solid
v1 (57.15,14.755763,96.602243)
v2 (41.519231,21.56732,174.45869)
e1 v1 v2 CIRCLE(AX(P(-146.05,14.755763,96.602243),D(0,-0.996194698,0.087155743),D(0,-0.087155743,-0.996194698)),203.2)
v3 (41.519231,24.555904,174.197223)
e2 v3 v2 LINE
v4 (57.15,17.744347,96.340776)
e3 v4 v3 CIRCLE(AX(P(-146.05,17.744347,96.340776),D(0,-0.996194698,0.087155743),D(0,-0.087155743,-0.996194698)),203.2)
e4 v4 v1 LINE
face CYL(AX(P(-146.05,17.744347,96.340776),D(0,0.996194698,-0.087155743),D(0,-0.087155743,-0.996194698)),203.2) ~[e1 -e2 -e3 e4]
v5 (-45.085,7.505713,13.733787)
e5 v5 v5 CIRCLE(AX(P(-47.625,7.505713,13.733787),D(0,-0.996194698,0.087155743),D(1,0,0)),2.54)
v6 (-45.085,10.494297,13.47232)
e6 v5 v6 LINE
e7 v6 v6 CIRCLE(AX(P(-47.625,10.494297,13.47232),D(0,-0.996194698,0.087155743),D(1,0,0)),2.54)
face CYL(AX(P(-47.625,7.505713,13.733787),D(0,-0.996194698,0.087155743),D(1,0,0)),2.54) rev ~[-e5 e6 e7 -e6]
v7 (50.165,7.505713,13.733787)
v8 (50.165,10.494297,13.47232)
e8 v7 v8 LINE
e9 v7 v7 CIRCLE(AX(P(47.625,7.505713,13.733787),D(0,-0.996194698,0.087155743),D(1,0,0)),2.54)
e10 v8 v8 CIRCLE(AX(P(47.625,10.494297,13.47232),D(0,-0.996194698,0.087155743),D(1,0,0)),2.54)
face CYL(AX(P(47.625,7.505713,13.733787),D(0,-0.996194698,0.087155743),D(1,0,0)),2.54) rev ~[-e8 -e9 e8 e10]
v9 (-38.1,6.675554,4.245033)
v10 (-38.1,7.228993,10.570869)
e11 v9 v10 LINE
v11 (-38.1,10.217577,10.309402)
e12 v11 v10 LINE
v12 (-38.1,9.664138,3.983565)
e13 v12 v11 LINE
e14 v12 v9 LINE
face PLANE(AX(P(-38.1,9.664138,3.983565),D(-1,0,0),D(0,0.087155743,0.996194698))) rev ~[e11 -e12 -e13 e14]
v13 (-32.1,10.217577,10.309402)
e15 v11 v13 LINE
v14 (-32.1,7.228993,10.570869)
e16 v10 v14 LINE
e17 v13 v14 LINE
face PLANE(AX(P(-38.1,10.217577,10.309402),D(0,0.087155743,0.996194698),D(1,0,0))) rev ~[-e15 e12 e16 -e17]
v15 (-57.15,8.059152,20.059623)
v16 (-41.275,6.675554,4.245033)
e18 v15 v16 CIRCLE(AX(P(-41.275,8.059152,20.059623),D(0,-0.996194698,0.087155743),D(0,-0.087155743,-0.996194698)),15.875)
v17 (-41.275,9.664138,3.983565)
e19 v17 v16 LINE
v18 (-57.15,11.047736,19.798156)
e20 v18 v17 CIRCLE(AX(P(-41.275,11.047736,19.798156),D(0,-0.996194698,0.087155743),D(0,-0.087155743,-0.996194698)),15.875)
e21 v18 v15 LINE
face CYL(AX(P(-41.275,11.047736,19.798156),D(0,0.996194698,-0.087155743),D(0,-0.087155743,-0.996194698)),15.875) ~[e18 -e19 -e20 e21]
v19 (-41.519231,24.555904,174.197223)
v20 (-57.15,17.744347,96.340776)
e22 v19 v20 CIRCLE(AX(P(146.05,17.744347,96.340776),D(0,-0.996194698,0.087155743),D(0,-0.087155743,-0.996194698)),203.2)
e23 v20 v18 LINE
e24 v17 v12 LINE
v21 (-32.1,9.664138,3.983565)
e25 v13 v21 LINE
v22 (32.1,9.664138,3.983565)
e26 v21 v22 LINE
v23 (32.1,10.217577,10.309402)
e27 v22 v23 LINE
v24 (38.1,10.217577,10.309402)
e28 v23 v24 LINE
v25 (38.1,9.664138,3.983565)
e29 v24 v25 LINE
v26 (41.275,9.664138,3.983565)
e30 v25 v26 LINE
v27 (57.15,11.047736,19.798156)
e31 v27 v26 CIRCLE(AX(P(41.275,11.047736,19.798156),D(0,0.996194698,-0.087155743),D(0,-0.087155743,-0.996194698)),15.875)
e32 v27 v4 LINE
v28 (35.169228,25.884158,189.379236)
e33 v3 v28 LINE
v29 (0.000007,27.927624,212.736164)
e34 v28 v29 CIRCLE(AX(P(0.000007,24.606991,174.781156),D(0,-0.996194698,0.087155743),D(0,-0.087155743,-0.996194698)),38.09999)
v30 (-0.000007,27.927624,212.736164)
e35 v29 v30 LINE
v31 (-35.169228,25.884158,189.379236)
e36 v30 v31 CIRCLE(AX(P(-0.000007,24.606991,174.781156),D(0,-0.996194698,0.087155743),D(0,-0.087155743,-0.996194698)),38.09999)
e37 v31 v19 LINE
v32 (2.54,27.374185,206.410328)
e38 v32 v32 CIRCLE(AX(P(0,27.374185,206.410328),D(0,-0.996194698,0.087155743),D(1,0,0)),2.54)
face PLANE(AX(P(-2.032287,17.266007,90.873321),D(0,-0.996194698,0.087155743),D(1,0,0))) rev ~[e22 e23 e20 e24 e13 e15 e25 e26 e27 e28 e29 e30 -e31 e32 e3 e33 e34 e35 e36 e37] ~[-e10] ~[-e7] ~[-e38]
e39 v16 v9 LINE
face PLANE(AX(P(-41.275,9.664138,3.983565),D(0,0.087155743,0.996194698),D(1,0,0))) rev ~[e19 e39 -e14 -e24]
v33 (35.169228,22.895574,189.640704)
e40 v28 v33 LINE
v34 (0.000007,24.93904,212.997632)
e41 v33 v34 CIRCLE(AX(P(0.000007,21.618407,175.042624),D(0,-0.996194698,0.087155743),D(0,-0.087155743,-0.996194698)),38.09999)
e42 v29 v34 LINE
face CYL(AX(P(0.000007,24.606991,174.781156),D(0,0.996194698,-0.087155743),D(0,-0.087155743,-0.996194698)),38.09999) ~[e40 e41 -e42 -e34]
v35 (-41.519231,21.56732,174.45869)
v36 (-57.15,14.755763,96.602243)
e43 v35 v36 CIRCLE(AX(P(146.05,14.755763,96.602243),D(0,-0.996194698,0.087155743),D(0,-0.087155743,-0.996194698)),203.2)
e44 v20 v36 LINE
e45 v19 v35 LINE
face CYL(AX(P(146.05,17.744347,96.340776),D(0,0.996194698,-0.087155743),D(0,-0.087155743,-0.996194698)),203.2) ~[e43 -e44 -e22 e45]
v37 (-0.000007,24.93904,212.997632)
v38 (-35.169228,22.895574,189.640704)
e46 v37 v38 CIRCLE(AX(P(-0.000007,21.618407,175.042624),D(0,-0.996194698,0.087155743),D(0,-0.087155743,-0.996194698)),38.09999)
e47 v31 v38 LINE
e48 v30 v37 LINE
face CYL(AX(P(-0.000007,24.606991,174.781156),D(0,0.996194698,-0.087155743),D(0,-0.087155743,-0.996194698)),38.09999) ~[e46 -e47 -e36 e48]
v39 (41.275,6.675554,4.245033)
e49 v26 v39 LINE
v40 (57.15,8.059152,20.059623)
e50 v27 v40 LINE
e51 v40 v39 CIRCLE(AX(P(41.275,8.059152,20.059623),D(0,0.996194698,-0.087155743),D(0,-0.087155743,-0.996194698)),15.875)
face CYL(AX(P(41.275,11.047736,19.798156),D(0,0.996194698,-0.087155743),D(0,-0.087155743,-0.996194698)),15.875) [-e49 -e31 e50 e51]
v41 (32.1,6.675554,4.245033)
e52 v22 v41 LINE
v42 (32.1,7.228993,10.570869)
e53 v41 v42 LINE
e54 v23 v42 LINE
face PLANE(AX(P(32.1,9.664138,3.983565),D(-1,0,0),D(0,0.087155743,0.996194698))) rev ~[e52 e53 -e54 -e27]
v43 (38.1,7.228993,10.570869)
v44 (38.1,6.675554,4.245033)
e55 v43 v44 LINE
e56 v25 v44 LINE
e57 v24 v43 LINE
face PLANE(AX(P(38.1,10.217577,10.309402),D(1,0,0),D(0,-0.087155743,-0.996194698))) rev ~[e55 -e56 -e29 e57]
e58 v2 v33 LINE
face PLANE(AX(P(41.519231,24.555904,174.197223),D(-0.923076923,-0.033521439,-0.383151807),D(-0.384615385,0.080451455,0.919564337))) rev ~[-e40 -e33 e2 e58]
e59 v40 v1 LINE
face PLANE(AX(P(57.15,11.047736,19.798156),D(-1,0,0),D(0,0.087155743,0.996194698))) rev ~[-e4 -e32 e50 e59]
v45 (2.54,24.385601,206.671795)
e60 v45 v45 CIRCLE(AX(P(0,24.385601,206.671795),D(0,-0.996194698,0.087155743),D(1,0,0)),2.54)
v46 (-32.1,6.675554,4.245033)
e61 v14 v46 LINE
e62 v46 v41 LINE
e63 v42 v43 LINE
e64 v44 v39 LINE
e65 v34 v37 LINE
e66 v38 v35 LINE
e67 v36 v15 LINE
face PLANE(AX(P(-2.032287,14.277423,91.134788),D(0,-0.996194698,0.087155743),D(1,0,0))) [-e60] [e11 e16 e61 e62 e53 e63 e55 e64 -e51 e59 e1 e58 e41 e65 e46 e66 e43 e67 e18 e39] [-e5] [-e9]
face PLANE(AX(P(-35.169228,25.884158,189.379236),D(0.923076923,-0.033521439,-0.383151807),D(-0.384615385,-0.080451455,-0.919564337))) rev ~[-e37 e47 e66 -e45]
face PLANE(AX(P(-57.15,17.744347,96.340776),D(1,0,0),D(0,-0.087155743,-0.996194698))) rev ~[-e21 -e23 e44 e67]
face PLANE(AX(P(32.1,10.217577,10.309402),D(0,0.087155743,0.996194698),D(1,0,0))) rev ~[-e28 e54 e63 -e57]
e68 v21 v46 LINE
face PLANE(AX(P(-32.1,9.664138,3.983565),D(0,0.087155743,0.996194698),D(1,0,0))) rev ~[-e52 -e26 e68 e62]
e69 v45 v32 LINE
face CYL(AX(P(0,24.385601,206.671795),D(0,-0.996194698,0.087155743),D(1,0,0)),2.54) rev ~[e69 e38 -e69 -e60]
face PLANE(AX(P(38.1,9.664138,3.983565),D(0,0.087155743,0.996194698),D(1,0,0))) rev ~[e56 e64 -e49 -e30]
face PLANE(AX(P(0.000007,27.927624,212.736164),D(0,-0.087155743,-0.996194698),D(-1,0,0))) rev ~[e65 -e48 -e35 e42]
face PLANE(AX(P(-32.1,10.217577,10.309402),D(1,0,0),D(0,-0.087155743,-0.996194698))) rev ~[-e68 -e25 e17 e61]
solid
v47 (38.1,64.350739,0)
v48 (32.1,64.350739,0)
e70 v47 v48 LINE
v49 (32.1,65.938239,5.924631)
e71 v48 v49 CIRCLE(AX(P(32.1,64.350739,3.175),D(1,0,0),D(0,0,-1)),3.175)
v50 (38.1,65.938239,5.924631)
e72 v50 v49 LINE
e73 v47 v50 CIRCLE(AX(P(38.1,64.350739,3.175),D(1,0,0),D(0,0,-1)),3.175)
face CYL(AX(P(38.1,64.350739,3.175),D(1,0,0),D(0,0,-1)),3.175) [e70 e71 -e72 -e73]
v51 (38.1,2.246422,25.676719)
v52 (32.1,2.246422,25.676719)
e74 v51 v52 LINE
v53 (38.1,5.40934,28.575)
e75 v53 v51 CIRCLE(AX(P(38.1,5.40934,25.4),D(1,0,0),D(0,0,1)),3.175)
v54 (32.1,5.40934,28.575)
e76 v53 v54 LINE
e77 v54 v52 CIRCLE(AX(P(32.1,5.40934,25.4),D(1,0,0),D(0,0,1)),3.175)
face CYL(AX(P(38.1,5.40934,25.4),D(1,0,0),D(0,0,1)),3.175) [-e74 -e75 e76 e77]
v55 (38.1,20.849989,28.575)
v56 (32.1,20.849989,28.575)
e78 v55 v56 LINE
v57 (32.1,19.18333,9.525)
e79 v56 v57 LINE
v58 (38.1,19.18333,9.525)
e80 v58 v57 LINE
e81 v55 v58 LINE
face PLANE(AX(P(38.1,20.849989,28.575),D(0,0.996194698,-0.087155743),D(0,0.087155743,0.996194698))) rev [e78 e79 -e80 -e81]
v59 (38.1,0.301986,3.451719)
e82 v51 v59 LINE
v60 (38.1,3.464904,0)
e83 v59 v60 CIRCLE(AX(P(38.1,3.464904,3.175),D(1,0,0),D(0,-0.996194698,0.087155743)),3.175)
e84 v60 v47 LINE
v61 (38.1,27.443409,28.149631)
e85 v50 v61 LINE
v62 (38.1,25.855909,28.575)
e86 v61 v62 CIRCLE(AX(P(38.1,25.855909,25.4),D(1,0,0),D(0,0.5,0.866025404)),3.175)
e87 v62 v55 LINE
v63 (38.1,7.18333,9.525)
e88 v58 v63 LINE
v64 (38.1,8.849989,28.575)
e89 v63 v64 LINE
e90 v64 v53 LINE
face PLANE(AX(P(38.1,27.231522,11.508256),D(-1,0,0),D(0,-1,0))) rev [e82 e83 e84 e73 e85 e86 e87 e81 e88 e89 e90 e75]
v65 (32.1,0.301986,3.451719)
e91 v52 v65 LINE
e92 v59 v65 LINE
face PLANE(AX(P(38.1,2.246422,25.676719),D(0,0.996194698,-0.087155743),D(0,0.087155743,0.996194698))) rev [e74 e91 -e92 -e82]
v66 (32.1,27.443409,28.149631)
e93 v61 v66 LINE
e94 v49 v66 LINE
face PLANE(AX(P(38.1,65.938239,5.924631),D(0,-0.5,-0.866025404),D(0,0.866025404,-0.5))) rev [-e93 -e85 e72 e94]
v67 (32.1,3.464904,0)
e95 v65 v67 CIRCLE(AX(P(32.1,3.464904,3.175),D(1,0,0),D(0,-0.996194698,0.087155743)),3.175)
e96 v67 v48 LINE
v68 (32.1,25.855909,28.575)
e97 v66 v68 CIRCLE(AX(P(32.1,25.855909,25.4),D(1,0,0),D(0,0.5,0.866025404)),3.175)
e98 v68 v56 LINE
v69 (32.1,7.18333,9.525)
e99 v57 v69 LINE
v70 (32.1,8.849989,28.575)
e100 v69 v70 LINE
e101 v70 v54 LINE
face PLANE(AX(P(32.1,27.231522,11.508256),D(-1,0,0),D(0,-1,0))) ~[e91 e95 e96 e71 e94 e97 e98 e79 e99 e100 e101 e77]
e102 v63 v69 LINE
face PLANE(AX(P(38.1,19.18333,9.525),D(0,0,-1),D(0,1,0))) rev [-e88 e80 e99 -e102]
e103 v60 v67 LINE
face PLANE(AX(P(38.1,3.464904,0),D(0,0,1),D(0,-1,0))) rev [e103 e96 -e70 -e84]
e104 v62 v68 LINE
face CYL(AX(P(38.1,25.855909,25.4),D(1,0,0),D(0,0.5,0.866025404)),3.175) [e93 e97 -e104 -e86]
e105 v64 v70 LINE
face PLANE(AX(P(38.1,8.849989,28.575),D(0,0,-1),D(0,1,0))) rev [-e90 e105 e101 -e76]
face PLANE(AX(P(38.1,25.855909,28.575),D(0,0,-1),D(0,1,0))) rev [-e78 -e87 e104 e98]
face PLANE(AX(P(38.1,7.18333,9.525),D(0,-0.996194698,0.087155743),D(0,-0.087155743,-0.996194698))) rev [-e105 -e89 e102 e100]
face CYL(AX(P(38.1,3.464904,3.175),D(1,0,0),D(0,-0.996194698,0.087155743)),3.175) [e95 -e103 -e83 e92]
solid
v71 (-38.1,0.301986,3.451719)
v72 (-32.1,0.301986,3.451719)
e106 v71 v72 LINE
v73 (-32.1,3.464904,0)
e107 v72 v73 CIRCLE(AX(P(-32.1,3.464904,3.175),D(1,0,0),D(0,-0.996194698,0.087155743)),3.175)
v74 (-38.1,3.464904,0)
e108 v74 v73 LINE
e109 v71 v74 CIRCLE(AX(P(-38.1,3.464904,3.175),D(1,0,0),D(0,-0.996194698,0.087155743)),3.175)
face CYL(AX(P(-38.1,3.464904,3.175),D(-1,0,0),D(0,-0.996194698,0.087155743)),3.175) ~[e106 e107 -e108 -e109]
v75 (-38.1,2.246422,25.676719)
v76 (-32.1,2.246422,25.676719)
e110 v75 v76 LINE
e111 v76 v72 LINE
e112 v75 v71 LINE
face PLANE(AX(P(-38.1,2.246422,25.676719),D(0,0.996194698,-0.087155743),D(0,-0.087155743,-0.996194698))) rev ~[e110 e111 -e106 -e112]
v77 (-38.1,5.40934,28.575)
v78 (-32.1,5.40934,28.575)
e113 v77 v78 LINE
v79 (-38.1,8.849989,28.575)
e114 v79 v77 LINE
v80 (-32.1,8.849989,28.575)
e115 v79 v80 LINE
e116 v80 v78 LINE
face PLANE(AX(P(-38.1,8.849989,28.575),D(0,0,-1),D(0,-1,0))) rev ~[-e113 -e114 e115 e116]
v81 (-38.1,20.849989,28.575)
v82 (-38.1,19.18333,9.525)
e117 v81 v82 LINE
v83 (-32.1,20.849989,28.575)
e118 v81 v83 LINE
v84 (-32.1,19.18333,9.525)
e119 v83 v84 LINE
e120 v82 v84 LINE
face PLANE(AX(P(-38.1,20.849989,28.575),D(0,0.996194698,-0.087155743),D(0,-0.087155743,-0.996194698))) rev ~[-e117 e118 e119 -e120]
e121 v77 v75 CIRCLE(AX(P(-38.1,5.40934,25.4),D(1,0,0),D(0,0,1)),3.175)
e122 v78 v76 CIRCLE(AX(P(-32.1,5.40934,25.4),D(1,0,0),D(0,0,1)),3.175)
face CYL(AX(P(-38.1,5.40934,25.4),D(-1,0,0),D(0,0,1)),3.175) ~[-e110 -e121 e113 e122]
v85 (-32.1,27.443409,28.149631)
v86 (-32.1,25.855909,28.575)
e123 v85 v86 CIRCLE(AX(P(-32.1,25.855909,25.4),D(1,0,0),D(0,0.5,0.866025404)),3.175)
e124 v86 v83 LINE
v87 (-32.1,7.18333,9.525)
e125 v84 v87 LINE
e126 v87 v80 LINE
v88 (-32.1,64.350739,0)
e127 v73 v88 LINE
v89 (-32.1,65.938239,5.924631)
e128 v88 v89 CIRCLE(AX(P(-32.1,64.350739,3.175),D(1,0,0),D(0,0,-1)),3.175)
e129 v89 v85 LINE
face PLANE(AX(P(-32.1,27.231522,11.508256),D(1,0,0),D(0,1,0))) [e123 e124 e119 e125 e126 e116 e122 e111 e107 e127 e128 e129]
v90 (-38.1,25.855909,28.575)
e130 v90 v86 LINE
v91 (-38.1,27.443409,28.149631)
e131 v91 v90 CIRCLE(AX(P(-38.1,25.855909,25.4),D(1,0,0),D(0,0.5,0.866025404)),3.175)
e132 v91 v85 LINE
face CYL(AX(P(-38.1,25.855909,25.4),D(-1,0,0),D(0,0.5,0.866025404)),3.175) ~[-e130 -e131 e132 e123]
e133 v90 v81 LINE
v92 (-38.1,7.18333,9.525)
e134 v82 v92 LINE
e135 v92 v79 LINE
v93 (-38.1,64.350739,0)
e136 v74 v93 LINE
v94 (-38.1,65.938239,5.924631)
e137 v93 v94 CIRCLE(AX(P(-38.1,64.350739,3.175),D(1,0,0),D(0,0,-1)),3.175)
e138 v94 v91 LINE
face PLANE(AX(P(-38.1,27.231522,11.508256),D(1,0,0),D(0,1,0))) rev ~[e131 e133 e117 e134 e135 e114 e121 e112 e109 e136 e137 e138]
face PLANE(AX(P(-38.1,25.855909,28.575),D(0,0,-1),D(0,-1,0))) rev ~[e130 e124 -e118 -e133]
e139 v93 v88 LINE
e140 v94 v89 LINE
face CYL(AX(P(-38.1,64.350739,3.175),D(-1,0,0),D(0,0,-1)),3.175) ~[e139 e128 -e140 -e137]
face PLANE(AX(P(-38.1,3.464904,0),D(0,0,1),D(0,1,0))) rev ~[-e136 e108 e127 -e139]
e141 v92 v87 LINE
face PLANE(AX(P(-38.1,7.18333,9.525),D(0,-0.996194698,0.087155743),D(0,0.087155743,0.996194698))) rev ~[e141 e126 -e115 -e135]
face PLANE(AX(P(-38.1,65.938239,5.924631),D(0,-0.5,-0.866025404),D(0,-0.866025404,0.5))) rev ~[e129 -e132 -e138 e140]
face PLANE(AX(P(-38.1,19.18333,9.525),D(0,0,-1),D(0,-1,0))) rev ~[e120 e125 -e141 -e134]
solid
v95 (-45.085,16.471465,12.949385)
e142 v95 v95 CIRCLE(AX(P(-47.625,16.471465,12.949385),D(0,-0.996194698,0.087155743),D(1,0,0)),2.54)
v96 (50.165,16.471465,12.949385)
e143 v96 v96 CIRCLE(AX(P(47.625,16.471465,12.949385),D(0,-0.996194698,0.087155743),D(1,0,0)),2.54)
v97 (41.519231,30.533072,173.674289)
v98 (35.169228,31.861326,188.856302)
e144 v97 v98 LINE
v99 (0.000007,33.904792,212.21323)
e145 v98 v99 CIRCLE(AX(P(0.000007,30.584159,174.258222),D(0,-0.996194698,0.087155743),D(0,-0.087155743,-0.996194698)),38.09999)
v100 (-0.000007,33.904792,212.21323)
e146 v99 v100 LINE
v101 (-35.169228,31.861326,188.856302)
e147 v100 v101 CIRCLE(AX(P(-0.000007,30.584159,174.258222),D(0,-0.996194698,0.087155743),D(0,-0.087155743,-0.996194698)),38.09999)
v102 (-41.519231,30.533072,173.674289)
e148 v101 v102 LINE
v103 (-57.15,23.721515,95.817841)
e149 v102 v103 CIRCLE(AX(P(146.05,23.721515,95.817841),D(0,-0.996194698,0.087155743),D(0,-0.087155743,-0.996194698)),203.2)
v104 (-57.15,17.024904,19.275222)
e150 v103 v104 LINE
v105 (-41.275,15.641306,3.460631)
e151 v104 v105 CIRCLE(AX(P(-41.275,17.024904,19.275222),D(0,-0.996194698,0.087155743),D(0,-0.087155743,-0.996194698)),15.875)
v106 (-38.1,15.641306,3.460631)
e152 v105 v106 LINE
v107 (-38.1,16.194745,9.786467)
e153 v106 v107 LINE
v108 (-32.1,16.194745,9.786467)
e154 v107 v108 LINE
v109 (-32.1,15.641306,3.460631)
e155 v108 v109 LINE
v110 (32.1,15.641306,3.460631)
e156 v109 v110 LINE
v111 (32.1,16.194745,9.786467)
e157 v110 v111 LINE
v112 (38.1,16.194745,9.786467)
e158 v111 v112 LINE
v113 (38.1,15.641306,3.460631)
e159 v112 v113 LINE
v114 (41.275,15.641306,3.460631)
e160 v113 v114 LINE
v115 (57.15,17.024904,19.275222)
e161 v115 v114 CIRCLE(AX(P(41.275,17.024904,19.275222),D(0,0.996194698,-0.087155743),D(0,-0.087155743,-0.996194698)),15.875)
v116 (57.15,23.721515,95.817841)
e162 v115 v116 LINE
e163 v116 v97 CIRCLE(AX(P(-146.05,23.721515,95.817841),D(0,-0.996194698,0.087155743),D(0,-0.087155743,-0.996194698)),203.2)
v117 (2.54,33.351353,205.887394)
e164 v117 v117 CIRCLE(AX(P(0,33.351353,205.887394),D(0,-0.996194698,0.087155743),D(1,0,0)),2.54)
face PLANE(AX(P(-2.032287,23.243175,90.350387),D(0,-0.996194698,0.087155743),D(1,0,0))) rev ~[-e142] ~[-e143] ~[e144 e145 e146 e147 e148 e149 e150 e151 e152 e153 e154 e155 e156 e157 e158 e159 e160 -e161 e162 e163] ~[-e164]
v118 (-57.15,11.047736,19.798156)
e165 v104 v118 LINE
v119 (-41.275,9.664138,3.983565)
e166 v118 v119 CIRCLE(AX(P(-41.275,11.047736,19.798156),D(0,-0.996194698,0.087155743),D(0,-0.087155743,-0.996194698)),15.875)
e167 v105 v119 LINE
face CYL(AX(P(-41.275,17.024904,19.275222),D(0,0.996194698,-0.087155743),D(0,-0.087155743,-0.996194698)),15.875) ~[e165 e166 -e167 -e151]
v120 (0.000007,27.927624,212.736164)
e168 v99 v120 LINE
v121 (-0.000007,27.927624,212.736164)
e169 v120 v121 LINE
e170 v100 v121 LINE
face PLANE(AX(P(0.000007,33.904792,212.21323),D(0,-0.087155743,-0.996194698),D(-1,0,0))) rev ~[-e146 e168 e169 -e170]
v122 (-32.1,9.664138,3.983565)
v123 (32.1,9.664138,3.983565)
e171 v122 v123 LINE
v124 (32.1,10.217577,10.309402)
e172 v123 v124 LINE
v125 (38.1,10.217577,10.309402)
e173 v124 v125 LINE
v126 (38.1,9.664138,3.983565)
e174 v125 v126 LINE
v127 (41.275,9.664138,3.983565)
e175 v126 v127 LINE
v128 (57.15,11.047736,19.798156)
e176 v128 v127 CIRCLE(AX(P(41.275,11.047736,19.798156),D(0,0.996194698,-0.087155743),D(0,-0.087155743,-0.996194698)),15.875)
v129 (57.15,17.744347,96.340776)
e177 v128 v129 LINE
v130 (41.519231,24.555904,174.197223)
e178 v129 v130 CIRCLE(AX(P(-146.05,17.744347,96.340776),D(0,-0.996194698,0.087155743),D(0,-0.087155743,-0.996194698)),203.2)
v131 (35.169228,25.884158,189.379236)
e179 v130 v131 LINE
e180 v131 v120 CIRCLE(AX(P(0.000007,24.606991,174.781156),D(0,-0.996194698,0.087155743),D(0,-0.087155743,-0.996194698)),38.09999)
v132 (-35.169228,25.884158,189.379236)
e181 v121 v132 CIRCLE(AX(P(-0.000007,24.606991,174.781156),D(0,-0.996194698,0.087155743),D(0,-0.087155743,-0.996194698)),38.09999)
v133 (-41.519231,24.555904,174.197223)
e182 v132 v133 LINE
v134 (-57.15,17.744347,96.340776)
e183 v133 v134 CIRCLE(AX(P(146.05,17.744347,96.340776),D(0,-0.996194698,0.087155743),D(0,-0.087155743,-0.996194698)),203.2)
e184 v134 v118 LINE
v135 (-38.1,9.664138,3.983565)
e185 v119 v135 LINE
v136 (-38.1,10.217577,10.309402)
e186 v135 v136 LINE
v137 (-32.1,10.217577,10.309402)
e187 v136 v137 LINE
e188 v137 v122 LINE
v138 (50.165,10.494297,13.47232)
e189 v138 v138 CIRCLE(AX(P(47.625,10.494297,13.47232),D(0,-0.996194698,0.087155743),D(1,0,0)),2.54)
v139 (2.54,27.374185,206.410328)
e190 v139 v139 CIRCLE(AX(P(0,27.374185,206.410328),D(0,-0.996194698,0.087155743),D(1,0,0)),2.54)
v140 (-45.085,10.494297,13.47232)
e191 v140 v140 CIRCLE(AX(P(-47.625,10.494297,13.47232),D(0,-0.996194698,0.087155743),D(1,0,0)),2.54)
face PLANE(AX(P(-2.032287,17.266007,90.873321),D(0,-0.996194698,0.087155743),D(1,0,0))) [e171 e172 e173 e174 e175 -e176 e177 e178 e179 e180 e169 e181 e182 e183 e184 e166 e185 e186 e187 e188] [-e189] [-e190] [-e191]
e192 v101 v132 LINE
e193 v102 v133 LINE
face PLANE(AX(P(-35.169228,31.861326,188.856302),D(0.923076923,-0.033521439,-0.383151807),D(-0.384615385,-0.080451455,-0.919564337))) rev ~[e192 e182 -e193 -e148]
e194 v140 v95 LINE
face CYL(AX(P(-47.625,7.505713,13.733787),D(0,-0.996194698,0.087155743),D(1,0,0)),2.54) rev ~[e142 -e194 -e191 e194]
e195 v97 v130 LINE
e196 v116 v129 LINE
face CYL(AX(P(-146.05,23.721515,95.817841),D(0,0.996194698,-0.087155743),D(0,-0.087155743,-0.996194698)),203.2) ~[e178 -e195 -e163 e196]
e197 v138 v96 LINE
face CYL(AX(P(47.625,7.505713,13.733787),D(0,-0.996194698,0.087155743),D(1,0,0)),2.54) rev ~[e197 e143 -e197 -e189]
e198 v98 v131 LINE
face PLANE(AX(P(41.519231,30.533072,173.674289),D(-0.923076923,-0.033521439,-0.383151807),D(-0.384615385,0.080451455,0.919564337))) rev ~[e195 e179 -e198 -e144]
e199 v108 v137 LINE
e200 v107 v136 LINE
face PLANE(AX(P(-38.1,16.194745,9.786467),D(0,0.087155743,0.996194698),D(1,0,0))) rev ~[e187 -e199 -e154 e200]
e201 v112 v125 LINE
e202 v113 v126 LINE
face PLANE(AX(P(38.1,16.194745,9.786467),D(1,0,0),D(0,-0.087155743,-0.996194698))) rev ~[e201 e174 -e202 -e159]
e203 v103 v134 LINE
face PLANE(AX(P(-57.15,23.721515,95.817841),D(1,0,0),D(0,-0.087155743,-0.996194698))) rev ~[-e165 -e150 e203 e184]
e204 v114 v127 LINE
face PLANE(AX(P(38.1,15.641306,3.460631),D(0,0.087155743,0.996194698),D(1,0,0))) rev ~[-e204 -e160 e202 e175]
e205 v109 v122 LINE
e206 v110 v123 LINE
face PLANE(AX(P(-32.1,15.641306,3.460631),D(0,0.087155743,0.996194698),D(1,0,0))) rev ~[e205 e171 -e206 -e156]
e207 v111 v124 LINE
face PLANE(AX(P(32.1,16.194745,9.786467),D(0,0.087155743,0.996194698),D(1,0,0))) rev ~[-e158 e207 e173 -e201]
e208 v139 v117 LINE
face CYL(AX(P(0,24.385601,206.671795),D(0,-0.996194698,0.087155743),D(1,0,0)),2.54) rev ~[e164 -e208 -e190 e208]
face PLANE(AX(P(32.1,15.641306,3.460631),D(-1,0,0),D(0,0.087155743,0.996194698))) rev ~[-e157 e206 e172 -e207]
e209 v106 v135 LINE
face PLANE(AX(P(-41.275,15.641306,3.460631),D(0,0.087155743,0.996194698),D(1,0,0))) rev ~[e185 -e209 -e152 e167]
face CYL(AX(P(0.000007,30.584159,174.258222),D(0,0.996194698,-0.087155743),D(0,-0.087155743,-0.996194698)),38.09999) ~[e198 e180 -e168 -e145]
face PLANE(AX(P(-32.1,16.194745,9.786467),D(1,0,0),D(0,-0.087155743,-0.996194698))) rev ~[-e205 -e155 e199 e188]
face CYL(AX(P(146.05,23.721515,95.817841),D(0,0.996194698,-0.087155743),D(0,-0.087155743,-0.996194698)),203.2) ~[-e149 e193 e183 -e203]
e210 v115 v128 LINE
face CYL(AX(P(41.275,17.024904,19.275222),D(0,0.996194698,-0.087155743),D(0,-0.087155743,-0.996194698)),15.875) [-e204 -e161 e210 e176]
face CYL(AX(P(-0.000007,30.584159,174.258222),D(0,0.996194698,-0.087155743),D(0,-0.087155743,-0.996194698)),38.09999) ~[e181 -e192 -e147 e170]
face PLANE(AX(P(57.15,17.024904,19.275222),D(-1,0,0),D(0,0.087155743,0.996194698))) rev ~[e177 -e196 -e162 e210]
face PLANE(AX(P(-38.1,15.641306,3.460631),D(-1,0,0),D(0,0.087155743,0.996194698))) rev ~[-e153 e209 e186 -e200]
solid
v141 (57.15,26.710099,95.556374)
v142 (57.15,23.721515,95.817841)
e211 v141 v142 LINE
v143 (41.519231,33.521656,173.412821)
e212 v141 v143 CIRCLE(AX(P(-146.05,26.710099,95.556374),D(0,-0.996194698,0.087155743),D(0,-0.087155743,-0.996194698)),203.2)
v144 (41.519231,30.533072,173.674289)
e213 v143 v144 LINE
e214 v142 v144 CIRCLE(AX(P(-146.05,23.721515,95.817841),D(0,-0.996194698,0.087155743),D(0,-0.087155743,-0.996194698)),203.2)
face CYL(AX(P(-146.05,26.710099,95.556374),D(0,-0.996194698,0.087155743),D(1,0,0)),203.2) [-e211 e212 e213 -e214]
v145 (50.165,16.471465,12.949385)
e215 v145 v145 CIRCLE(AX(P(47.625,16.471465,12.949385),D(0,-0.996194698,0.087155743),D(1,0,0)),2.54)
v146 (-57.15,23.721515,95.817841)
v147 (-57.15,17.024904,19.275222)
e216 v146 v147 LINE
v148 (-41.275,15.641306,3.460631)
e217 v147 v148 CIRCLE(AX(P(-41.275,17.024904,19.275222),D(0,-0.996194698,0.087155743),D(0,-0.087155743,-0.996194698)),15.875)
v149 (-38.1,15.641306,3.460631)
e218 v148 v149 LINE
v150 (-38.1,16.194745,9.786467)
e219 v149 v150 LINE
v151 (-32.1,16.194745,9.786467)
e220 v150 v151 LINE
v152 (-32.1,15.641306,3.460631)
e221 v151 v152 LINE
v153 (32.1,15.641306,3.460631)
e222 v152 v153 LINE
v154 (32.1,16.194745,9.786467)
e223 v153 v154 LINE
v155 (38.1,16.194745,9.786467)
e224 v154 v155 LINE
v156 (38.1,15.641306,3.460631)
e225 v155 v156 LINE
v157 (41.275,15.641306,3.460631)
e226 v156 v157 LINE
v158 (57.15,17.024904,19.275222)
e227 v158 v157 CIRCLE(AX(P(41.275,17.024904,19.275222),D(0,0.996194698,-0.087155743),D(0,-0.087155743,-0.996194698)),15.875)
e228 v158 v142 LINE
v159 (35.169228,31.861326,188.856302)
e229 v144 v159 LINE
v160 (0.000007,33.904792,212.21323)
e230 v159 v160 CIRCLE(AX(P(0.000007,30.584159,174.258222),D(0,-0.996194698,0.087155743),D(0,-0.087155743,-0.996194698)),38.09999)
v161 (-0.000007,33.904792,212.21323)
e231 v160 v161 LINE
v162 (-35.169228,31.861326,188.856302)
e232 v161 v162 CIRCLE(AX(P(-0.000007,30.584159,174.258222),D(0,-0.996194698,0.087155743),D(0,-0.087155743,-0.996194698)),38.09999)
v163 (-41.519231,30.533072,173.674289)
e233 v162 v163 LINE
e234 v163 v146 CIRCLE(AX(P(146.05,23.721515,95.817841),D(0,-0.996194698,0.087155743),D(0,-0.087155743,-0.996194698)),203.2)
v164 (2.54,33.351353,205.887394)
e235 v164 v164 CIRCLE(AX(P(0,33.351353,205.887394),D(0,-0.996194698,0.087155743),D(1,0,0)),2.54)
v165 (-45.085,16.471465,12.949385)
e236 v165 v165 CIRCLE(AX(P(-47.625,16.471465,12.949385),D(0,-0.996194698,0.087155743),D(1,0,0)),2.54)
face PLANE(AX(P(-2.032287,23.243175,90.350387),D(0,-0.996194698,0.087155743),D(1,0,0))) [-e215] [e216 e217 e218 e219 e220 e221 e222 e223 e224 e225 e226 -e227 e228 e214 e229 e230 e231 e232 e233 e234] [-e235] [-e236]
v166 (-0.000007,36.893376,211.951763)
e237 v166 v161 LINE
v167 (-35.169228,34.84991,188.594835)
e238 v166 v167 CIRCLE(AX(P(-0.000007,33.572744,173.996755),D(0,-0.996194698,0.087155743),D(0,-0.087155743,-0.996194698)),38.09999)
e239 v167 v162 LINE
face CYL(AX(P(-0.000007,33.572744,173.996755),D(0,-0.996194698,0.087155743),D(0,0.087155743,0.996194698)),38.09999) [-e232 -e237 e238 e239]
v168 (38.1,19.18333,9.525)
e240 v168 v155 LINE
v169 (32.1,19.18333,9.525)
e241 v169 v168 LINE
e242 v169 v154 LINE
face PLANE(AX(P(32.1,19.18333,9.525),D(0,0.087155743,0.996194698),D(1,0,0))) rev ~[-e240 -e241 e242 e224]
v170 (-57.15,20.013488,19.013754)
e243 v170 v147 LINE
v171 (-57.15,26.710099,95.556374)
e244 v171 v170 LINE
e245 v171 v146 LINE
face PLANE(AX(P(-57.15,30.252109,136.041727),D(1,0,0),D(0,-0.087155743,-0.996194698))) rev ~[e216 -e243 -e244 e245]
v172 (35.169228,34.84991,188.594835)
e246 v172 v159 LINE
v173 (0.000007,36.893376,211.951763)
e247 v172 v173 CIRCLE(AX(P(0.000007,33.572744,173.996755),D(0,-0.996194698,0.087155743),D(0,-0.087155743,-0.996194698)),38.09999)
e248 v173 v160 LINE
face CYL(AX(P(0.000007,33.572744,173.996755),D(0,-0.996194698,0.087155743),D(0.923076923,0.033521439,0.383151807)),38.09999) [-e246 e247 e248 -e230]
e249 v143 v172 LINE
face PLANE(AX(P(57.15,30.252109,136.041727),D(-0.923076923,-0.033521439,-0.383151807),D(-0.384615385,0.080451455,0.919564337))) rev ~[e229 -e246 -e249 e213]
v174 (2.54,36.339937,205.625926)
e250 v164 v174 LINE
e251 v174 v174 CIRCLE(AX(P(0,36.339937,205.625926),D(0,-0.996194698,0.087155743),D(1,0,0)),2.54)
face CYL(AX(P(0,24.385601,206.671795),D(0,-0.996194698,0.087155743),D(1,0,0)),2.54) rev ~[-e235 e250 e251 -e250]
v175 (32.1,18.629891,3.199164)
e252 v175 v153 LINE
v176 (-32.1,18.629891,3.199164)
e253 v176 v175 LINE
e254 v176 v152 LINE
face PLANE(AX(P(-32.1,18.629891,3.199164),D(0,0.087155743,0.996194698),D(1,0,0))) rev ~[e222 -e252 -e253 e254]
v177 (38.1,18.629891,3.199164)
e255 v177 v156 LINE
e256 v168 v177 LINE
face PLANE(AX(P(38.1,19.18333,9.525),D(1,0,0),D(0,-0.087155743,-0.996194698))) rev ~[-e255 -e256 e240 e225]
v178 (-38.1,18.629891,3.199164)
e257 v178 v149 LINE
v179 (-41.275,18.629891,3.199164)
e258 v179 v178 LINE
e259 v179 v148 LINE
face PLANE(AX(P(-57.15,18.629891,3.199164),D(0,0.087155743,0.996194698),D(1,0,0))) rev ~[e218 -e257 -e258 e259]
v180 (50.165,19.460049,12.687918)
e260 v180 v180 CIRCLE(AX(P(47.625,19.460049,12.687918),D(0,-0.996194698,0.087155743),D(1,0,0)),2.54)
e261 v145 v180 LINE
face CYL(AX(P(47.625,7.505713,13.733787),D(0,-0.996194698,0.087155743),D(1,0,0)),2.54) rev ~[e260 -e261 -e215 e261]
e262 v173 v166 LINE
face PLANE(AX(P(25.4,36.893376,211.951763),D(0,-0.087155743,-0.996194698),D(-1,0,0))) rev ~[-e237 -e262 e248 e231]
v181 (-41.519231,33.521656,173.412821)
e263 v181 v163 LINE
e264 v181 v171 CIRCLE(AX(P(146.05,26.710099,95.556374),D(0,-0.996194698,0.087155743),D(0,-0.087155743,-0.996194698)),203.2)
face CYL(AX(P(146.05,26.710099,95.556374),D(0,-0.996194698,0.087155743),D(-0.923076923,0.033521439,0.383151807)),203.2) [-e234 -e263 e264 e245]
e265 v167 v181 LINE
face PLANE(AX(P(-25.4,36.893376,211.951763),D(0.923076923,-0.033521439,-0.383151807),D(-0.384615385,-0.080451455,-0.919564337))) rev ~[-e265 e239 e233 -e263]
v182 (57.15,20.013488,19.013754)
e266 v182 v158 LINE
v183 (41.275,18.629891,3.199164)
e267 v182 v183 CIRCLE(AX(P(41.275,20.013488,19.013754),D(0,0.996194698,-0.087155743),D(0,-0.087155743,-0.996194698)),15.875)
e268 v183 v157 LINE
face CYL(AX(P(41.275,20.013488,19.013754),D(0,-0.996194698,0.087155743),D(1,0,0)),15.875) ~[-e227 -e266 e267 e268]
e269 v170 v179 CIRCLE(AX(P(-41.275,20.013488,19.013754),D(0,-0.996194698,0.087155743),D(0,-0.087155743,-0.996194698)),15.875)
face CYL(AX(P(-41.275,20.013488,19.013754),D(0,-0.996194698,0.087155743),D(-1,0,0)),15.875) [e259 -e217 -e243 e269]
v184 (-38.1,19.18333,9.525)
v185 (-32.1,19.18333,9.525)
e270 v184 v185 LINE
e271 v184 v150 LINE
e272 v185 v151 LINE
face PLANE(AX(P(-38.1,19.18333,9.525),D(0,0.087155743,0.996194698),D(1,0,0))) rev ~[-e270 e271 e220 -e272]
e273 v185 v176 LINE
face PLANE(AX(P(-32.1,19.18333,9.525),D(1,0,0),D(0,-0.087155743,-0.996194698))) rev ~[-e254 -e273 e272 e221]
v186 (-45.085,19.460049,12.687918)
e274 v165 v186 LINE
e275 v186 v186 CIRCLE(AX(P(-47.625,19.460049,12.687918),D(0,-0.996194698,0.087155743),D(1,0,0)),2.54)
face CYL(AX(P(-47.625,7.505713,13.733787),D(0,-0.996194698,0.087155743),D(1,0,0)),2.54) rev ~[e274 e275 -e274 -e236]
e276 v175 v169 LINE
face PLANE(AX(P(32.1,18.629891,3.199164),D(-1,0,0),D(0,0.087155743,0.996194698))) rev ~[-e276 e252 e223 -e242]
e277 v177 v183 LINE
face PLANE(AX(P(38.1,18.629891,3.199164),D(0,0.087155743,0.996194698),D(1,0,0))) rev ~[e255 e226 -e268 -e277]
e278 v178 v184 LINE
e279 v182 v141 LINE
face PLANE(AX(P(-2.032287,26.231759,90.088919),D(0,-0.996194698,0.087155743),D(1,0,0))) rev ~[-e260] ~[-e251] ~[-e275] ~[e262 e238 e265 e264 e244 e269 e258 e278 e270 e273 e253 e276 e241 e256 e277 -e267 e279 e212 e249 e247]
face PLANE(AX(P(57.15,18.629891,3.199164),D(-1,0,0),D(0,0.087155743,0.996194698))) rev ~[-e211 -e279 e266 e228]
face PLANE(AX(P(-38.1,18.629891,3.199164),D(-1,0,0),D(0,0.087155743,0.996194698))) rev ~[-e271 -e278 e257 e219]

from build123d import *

# Parameters (mm, degrees)
F2_DEPTH  = 6
F4_W      = 6
F4_H      = 19.1227679052
F5_DEPTH  = 3
F6_R      = 203.2
F7_R      = 38.09999
F8_R      = 15.875
F9_DEPTH  = 6
F10_DEPTH = 3
F11_R     = 2.54
F12_DEPTH = 25.4


# Not quite as in the source:
# - a fillet or chamfer is up to 0.001 mm smaller than in the source, because OpenCascade refuses the exact size


with BuildPart() as f2:
    # F1 (on offset) → F2 (new body)
    with BuildSketch(Plane.YZ.offset(-38.1)):
        with BuildLine():
            ThreePointArc((0.3019863245, 3.4517194832), (1.1240489465, 1.0300010908), (3.4649044909, 0))
            Line((3.4649044909, 0), (64.350738686, 0))
            ThreePointArc((64.350738686, 0), (67.4175531844, 2.3532495318), (65.938238686, 5.924630657))
            Line((65.938238686, 5.924630657), (27.4434094878, 28.149630657))
            ThreePointArc((27.4434094878, 28.149630657), (26.677659956, 28.4668144985), (25.8559094878, 28.575))
            Line((25.8559094878, 28.575), (20.8499885603, 28.575))
            Line((20.8499885603, 28.575), (19.1833295201, 9.525))
            Line((19.1833295201, 9.525), (7.1833295201, 9.525))
            Line((7.1833295201, 9.525), (8.8499885603, 28.575))
            Line((8.8499885603, 28.575), (5.4093400378, 28.575))
            ThreePointArc((5.4093400378, 28.575), (3.2643411286, 27.7408555444), (2.2464218713, 25.6767194832))
            Line((2.2464218713, 25.6767194832), (0.3019863245, 3.4517194832))
        make_face()
    extrude(amount=F2_DEPTH)


with BuildPart() as f3_1:
    # F3: instance of F2
    add(f2.part.mirror(Plane.YZ))


with BuildPart() as f5:
    # F4 (on face) → F5 (new body)
    with BuildSketch(Plane(origin=(0, 18.2106111339, -1.5932220301), x_dir=(1, 0, 0), z_dir=(0, -0.9961946981, 0.0871557427))):
        Polygon((32.1, 11.160691832), (38.1, 11.160691832), (38.1, 4.810691832), (57.15, 4.810691832), (57.15, 11.160691832), (57.15, 138.160691832), (25.4, 214.360691832), (-25.4, 214.360691832), (-57.15, 138.160691832), (-57.15, 11.160691832), (-57.15, 4.810691832), (-38.1, 4.810691832), (-38.1, 11.160691832), (-38.1, 30.2834597372), (-32.1, 30.2834597372), (-32.1, 11.160691832), (-32.1, 4.810691832), (32.1, 4.810691832), align=None)
        with Locations((-35.1, 20.7220757846)):
            Rectangle(F4_W, F4_H)
    extrude(amount=F5_DEPTH)

    # F6
    f6_edges = [f5.edges().sort_by_distance(p)[0] for p in [
        (-57.15, 28.757817, 136.17246),
        (57.15, 28.757817, 136.17246),
    ]]
    fillet(f6_edges, radius=F6_R)

    # F7 (radius 38.1 in the source; OpenCascade refuses exactly that, so slightly less here)
    f7_edges = [f5.edges().sort_by_distance(p)[0] for p in [
        (-25.4, 35.399084, 212.082496),
        (25.4, 35.399084, 212.082496),
    ]]
    fillet(f7_edges, radius=F7_R)

    # F8
    f8_edges = [f5.edges().sort_by_distance(p)[0] for p in [
        (-57.15, 17.135599, 3.329897),
        (57.15, 17.135599, 3.329897),
    ]]
    fillet(f8_edges, radius=F8_R)


with BuildPart() as f9:
    # F9 (new): a face of the model
    f9_faces = [f5.part.faces().sort_by_distance(p)[0] for p in [
        (0, 23.9302542283, 98.2037374296),
    ]]
    extrude(f9_faces, amount=F9_DEPTH)


with BuildPart() as f10:
    # F10 (new): a face of the model
    f10_faces = [f9.part.faces().sort_by_distance(p)[0] for p in [
        (0, 17.9530860398, 98.7266718861),
    ]]
    extrude(f10_faces, amount=F10_DEPTH)


with BuildPart() as f12_tool:
    # F11 (on face) → F12 (new body)
    with BuildSketch(Plane(origin=(0, 6.2562747568, -0.5473531171), x_dir=(1, 0, 0), z_dir=(0, -0.9961946981, 0.0871557427))):
        with Locations((-47.625, 14.335691832)):
            Circle(F11_R)
        with Locations((47.625, 14.335691832)):
            Circle(F11_R)
        with Locations((0, 208.010691832)):
            Circle(F11_R)
    extrude(amount=-F12_DEPTH)


with BuildPart() as f5_1:
    add(f5.part)

    # F12: cut by f12_tool
    add(f12_tool.part, mode=Mode.SUBTRACT)


with BuildPart() as f9_1:
    add(f9.part)

    # F12: cut by f12_tool
    add(f12_tool.part, mode=Mode.SUBTRACT)


with BuildPart() as f10_1:
    add(f10.part)

    # F12: cut by f12_tool
    add(f12_tool.part, mode=Mode.SUBTRACT)


solid = Compound([f2.part, f3_1.part, f5_1.part, f9_1.part, f10_1.part])
